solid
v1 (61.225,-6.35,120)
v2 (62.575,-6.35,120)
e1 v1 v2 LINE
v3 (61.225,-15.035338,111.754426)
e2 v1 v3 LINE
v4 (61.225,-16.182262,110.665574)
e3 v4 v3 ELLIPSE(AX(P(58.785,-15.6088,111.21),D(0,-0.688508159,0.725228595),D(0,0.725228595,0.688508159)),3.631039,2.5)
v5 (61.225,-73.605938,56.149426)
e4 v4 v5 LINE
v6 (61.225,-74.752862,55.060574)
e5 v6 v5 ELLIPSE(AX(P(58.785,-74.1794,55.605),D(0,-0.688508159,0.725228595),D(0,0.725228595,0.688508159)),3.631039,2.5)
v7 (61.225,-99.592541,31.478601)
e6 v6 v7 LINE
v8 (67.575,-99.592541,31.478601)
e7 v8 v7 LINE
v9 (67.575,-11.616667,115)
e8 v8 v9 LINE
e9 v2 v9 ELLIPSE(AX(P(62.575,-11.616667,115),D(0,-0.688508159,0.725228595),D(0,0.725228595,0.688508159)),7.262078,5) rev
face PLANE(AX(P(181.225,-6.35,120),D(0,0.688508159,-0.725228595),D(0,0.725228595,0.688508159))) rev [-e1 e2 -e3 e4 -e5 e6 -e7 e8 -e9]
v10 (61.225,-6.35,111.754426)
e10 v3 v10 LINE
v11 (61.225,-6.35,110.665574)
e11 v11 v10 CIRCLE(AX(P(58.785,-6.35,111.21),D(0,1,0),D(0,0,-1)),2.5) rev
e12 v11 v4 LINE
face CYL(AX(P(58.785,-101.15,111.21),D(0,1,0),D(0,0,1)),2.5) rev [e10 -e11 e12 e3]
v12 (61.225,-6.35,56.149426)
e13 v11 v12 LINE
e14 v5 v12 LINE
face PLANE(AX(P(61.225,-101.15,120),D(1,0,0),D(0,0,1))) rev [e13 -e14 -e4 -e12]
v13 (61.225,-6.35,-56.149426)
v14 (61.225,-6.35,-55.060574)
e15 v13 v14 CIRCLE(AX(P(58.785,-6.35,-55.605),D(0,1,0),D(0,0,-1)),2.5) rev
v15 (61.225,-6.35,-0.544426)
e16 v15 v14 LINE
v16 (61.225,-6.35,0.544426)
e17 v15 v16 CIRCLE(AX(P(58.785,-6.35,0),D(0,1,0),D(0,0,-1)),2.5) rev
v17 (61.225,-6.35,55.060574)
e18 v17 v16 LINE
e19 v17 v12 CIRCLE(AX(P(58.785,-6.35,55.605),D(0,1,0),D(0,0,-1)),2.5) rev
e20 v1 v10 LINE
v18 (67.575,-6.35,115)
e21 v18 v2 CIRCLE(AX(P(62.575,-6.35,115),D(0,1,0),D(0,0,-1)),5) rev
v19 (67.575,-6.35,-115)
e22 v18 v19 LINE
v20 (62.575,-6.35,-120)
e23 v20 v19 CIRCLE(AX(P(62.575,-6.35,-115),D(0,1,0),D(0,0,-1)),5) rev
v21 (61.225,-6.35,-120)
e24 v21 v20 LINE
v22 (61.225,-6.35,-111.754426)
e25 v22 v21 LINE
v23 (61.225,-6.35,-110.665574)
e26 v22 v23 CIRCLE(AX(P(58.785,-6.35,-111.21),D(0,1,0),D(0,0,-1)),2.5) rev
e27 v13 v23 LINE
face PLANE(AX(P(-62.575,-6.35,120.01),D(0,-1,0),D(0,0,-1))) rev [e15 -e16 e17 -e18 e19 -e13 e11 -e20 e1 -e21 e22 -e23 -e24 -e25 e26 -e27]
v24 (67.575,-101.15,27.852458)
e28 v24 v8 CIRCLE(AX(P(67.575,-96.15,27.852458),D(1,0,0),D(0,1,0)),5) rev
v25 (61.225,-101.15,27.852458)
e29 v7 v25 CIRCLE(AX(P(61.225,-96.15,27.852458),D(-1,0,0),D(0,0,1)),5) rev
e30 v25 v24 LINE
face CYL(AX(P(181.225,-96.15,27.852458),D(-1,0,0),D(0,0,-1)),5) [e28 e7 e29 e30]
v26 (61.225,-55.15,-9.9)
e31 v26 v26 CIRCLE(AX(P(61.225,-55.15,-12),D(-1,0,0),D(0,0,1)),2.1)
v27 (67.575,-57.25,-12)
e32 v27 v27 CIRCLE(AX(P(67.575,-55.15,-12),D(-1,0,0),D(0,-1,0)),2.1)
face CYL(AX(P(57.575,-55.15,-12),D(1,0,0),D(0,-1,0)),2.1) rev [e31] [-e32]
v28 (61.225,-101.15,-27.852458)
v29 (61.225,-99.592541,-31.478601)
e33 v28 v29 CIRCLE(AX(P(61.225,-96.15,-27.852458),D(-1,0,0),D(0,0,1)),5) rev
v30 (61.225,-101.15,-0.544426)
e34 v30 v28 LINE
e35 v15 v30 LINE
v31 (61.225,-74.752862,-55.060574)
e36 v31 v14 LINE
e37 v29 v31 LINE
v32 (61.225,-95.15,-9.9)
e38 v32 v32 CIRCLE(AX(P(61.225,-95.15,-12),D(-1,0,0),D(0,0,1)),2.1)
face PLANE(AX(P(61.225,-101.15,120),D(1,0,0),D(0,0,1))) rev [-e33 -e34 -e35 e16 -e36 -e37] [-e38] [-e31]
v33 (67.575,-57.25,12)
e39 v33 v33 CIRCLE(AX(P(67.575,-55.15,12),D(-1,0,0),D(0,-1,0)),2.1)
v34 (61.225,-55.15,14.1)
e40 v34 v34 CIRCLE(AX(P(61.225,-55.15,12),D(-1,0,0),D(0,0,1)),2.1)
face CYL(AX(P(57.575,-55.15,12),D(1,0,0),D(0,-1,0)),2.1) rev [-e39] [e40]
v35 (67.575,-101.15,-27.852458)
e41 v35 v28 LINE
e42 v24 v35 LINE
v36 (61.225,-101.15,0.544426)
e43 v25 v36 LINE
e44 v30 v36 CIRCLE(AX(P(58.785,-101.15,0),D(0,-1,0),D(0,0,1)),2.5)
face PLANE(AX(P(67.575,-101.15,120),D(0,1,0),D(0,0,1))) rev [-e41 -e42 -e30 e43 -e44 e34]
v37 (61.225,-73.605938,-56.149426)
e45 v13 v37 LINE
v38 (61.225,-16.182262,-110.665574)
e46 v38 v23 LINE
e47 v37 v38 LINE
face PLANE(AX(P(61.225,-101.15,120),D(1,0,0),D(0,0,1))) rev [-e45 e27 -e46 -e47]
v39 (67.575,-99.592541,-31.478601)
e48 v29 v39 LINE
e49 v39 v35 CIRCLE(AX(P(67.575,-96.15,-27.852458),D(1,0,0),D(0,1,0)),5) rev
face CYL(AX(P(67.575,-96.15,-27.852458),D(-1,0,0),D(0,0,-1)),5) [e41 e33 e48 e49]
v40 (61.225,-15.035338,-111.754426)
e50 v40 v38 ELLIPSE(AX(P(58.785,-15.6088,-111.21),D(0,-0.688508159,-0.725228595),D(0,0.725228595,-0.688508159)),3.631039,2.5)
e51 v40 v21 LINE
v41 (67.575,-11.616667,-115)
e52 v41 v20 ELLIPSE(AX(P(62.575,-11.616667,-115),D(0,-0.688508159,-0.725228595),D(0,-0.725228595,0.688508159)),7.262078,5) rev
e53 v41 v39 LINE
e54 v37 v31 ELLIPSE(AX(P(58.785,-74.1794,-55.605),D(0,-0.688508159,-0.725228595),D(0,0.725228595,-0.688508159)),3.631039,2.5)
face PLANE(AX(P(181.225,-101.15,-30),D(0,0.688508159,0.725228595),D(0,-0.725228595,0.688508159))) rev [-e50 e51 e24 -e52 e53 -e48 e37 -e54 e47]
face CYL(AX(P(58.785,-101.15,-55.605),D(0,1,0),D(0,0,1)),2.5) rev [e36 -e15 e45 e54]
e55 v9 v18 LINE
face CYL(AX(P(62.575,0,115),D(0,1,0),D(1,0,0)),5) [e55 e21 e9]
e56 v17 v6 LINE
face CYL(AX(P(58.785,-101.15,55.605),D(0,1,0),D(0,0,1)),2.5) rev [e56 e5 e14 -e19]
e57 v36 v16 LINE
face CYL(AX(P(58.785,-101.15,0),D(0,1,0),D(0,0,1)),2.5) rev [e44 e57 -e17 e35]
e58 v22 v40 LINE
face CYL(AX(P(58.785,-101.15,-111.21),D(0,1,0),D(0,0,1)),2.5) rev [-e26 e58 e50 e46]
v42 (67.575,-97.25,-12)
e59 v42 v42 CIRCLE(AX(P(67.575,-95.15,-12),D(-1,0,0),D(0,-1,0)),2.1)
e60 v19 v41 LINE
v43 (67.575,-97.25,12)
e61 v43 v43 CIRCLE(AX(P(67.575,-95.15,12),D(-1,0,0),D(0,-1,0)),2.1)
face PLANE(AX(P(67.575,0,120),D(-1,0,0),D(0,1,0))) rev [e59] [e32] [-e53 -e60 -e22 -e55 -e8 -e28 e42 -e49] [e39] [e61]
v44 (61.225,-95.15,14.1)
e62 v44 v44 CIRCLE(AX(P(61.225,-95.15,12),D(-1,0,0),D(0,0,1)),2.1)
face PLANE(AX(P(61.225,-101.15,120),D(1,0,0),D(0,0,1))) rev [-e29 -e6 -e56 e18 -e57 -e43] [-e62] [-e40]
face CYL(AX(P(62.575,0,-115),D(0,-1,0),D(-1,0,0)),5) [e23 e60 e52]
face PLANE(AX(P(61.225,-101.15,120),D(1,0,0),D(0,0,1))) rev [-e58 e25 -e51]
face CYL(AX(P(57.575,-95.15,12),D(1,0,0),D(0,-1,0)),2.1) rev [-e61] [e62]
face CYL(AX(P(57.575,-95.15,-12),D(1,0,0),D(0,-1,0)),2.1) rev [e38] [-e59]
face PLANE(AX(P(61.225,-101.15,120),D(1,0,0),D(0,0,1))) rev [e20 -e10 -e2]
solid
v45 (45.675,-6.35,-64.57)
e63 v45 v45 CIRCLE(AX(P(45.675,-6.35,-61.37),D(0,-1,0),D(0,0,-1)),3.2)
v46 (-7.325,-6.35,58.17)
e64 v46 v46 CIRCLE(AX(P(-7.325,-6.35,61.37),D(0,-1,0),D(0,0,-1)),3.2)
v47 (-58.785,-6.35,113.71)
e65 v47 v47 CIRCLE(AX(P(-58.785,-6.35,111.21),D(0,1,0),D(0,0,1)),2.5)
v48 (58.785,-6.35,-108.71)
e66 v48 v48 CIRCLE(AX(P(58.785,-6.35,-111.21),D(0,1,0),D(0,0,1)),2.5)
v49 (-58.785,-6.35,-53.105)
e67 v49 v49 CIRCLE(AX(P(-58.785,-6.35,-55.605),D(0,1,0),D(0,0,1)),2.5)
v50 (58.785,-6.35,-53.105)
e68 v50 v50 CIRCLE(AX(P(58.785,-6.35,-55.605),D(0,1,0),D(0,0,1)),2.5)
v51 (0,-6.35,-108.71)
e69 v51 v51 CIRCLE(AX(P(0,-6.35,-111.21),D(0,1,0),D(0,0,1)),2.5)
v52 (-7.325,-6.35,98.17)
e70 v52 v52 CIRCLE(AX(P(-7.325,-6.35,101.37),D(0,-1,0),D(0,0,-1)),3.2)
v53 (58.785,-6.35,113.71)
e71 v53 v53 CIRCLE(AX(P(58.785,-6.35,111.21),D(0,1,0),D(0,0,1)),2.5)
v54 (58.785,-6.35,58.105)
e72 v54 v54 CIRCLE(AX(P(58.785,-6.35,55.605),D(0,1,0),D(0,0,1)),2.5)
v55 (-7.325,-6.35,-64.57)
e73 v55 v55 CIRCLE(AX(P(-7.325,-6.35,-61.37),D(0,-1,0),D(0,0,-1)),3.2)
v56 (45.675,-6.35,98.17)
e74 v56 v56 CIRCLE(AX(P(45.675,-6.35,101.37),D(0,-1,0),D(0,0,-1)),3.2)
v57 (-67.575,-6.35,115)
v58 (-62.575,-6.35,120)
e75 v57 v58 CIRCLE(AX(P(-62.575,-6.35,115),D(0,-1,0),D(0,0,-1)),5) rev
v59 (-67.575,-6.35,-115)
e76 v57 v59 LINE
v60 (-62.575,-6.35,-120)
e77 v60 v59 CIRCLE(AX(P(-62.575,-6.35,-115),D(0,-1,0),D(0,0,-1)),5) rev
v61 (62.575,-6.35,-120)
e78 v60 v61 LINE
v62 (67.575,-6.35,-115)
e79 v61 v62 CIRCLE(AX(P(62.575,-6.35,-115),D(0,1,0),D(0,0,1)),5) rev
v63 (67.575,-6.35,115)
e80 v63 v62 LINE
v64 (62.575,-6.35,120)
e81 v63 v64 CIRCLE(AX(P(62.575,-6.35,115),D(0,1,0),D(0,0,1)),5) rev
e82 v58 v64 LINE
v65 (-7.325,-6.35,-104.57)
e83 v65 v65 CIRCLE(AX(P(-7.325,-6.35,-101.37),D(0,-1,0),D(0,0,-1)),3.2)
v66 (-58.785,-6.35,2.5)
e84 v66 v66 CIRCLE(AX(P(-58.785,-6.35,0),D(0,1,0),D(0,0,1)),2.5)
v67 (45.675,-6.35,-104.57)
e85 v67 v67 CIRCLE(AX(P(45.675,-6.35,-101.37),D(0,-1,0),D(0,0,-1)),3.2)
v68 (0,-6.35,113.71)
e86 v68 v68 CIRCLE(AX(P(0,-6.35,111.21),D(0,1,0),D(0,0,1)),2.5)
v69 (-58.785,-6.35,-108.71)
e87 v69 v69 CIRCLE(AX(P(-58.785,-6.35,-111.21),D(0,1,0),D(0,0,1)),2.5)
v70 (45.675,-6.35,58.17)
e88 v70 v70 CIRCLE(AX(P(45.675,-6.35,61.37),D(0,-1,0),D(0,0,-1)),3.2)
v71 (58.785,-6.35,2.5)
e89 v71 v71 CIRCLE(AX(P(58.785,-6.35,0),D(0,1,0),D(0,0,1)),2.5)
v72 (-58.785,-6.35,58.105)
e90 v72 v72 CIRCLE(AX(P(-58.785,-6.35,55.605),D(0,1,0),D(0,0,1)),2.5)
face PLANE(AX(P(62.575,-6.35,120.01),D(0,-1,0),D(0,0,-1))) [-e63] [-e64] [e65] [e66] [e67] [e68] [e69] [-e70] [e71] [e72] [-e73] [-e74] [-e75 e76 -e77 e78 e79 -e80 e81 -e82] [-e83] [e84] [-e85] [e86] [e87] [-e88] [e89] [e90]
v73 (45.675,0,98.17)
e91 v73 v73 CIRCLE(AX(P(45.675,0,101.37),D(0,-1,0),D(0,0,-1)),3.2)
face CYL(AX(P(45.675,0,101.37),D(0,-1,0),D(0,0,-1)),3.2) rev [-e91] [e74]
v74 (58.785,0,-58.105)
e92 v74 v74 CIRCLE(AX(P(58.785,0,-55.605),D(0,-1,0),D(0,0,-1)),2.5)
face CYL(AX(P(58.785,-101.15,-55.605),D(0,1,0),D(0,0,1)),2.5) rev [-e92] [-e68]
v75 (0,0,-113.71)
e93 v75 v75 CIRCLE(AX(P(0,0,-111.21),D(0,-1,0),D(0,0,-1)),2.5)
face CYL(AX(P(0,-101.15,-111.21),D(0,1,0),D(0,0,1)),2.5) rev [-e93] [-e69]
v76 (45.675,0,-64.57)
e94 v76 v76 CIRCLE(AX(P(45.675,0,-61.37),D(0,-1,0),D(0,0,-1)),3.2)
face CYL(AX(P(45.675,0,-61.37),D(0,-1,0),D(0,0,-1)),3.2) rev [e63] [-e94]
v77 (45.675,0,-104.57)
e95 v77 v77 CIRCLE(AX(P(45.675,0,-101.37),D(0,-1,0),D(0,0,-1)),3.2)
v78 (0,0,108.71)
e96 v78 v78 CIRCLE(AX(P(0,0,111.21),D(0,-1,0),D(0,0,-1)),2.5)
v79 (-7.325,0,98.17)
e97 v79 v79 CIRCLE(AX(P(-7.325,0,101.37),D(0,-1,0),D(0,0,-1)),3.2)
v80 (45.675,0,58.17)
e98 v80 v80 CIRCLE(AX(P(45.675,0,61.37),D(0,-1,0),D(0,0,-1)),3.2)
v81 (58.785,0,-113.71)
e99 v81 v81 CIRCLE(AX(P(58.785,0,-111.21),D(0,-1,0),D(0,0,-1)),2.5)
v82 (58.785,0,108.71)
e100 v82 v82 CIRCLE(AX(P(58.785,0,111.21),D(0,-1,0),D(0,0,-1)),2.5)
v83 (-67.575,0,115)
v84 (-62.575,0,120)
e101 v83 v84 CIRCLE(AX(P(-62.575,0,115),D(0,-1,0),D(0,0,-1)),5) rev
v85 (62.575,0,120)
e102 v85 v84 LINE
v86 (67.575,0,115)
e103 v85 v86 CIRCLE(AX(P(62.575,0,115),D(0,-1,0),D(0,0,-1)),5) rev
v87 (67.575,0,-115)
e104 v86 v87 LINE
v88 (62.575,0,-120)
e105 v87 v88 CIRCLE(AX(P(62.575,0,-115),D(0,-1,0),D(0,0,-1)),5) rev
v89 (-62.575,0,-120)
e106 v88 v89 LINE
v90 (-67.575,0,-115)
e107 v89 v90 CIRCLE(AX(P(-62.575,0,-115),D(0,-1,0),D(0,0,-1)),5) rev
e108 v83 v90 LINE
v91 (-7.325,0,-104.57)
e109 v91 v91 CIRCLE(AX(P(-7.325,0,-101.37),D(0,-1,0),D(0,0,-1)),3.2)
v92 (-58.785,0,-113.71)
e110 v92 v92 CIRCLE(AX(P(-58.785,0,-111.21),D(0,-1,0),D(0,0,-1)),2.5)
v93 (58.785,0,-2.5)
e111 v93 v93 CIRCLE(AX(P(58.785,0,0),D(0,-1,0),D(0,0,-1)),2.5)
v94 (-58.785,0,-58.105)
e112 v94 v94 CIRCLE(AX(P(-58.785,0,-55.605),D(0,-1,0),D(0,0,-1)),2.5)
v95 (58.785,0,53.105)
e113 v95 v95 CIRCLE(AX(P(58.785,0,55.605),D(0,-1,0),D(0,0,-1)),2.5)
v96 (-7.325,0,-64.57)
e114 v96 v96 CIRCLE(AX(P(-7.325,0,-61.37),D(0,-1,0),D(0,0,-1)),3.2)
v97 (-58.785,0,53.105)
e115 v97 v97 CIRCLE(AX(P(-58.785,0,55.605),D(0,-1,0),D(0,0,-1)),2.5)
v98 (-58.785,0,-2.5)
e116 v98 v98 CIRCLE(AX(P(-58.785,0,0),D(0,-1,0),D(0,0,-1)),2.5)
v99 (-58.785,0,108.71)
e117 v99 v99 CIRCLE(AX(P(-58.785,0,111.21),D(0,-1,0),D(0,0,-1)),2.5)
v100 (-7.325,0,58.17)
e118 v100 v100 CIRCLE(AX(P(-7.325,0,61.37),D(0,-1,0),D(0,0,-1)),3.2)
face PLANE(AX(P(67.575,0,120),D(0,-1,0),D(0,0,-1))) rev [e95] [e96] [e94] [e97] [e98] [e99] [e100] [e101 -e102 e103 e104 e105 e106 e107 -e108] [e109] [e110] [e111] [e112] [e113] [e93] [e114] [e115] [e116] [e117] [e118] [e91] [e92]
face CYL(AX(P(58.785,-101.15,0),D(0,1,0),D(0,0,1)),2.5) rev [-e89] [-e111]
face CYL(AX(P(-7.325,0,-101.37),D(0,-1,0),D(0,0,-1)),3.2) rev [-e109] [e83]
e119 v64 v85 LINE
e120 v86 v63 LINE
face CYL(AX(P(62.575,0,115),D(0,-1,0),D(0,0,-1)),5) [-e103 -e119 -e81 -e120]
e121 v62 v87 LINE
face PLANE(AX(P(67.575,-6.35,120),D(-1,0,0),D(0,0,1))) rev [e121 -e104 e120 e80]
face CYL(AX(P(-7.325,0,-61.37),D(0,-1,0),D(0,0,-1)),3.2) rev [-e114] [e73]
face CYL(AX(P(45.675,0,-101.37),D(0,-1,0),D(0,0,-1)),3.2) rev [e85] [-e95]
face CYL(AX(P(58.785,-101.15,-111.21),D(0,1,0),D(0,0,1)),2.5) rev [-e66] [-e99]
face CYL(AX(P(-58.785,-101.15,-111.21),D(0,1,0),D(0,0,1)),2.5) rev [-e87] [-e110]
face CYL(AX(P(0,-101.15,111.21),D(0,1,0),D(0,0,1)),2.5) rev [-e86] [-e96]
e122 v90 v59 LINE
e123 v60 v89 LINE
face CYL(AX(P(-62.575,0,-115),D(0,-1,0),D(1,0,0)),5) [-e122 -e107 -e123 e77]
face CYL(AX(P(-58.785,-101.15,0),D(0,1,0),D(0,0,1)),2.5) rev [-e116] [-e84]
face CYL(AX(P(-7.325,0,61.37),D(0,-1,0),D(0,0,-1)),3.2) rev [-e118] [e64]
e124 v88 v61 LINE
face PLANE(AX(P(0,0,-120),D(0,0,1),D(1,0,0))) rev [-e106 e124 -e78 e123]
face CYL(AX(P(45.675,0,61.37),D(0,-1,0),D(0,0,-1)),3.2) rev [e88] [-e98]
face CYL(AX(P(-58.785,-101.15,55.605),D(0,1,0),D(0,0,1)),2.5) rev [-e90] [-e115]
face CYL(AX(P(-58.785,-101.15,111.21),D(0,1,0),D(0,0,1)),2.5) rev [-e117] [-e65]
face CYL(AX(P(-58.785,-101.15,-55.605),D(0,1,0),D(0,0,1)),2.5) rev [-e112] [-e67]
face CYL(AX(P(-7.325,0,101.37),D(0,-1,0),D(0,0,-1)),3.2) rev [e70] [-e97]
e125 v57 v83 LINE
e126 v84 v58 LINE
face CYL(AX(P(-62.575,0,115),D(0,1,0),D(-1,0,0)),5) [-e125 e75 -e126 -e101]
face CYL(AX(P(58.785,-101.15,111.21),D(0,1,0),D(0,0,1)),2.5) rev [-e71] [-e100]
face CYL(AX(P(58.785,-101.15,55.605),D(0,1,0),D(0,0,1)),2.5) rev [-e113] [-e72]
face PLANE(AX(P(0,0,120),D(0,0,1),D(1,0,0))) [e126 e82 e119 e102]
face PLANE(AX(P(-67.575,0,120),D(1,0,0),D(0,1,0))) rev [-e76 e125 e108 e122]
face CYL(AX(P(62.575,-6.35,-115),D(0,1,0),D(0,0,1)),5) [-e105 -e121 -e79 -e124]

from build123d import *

# Parameters (mm, degrees)
BOSS_EXTRUDE1_DEPTH     = 120
CUT_EXTRUDE1_DEPTH      = 120
CUT_EXTRUDE2_DEPTH      = 171.873354052
CUT_EXTRUDE2_DEPTH_BACK = 171.873354052
SKETCH4_R               = 2.5
FILLET1_R               = 5
SKETCH5_R               = 2.1
CUT_EXTRUDE3_DEPTH      = 10
SPLIT1_SURFACE_1_BACK   = 294.423
SPLIT1_SURFACE_1_DEPTH  = 588.846
SPLIT1_SURFACE_2_BACK   = 294.423
SPLIT1_SURFACE_2_DEPTH  = 588.846
CUT_EXTRUDE4_DEPTH      = 168.19276487
CUT_EXTRUDE4_DEPTH_BACK = 168.19276487
SKETCH7_R               = 3.2


with BuildPart() as part:
    # Sketch1 → Boss-Extrude1 (new, symmetric)
    with BuildSketch(Plane.XY):
        Polygon((67.575, 0), (-67.575, 0), (-67.575, -101.15), (-61.225, -101.15), (-61.225, -6.35), (67.575, -6.35), align=None)
    extrude(amount=BOSS_EXTRUDE1_DEPTH, both=True)

    # Sketch2 → Cut-Extrude1 (cut, symmetric)
    with BuildSketch(Plane(origin=(-61.225, 0, 0), x_dir=(0, 0, -1), z_dir=(1, 0, 0))):
        Polygon((-120, -6.35), (-30, -101.15), (30, -101.15), (120, -6.35), (120, -206.35), (-120, -206.35), align=None)
    extrude(amount=CUT_EXTRUDE1_DEPTH, both=True, mode=Mode.SUBTRACT)

    # Sketch4 → Cut-Extrude2 (cut, two sides: drawn at the far end of the back side and taken through both)
    with BuildSketch(Plane(origin=(0, 0, 0), x_dir=(1, 0, 0), z_dir=(0, 1, 0)).offset(-CUT_EXTRUDE2_DEPTH_BACK)):
        with Locations(Location((-58.785, 111.21, 0), (0, 0, 192.578118656))):
            Circle(SKETCH4_R)
        with Locations(Location((58.785, 111.21, 0), (0, 0, 270))):
            Circle(SKETCH4_R)
        with Locations(Location((58.785, 55.605, 0), (0, 0, 270))):
            Circle(SKETCH4_R)
        with Locations(Location((-58.785, 55.605, 0), (0, 0, 192.578118656))):
            Circle(SKETCH4_R)
        with Locations(Location((-58.785, 0, 0), (0, 0, 192.578118656))):
            Circle(SKETCH4_R)
        with Locations(Location((58.785, 0, 0), (0, 0, 270))):
            Circle(SKETCH4_R)
        with Locations(Location((-58.785, -55.605, 0), (0, 0, 192.578118656))):
            Circle(SKETCH4_R)
        with Locations(Location((58.785, -55.605, 0), (0, 0, 270))):
            Circle(SKETCH4_R)
        with Locations(Location((58.785, -111.21, 0), (0, 0, 270))):
            Circle(SKETCH4_R)
        with Locations(Location((-58.785, -111.21, 0), (0, 0, 192.578118656))):
            Circle(SKETCH4_R)
        with Locations(Location((0, 111.21, 0), (0, 0, 270))):
            Circle(SKETCH4_R)
        with Locations(Location((0, -111.21, 0), (0, 0, 270))):
            Circle(SKETCH4_R)
    extrude(amount=CUT_EXTRUDE2_DEPTH + CUT_EXTRUDE2_DEPTH_BACK, mode=Mode.SUBTRACT)

    # Fillet1
    fillet1_edges = [part.edges().sort_by_distance(p)[0] for p in [
        (-67.575, -3.175, 120),
        (-64.4, -101.15, 30),
        (-64.4, -101.15, -30),
        (67.575, -3.175, 120),
        (-67.575, -3.175, -120),
        (67.575, -3.175, -120),
    ]]
    fillet(fillet1_edges, radius=FILLET1_R)

    # Sketch5 → Cut-Extrude3 (cut)
    with BuildSketch(Plane.ZY.offset(67.575)):
        with Locations(Location((12, -55.15, 0), (0, 0, 270))):
            Circle(SKETCH5_R)
        with Locations(Location((-12, -55.15, 0), (0, 0, 270))):
            Circle(SKETCH5_R)
        with Locations(Location((-12, -95.15, 0), (0, 0, 270))):
            Circle(SKETCH5_R)
        with Locations(Location((12, -95.15, 0), (0, 0, 270))):
            Circle(SKETCH5_R)
    extrude(amount=-CUT_EXTRUDE3_DEPTH, mode=Mode.SUBTRACT)


with BuildPart() as body_2:
    # Split1: the piece behind the surface
    add(part.part)
    # Split1 surface: a surface, the sketch's curves swept straight by 588.846 mm
    with BuildLine(Plane(origin=(0, 0, -120), x_dir=(-1, 0, 0), z_dir=(0, 0, -1)).offset(-SPLIT1_SURFACE_1_BACK), mode=Mode.PRIVATE) as split1_surface_1_path:
        Line((-62.575, -6.35), (107.675385549, -6.35))
    split1_surface_1 = Shell.extrude(split1_surface_1_path.wire(), (0 * SPLIT1_SURFACE_1_DEPTH, 0 * SPLIT1_SURFACE_1_DEPTH, -1 * SPLIT1_SURFACE_1_DEPTH))
    split(bisect_by=split1_surface_1, keep=Keep.BOTTOM)


with BuildPart() as part_1:
    add(part.part)

    # Split1: split by a surface, the side it looks to stays
    # Split1 surface: a surface, the sketch's curves swept straight by 588.846 mm
    with BuildLine(Plane(origin=(0, 0, -120), x_dir=(-1, 0, 0), z_dir=(0, 0, -1)).offset(-SPLIT1_SURFACE_2_BACK), mode=Mode.PRIVATE) as split1_surface_2_path:
        Line((-62.575, -6.35), (107.675385549, -6.35))
    split1_surface_2 = Shell.extrude(split1_surface_2_path.wire(), (0 * SPLIT1_SURFACE_2_DEPTH, 0 * SPLIT1_SURFACE_2_DEPTH, -1 * SPLIT1_SURFACE_2_DEPTH))
    split(bisect_by=split1_surface_2, keep=Keep.TOP)

    # Sketch7 → Cut-Extrude4 (cut, two sides: drawn at the far end of the back side and taken through both)
    with BuildSketch(Plane.XZ.offset(6.35).offset(-CUT_EXTRUDE4_DEPTH_BACK)):
        with Locations(Location((-7.325, 101.37, 0), (0, 0, 270))):
            Circle(SKETCH7_R)
        with Locations(Location((45.675, 101.37, 0), (0, 0, 270))):
            Circle(SKETCH7_R)
        with Locations(Location((45.675, 61.37, 0), (0, 0, 270))):
            Circle(SKETCH7_R)
        with Locations(Location((-7.325, 61.37, 0), (0, 0, 270))):
            Circle(SKETCH7_R)
        with Locations(Location((-7.325, -61.37, 0), (0, 0, 270))):
            Circle(SKETCH7_R)
        with Locations(Location((45.675, -61.37, 0), (0, 0, 270))):
            Circle(SKETCH7_R)
        with Locations(Location((-7.325, -101.37, 0), (0, 0, 270))):
            Circle(SKETCH7_R)
        with Locations(Location((45.675, -101.37, 0), (0, 0, 270))):
            Circle(SKETCH7_R)
    extrude(amount=CUT_EXTRUDE4_DEPTH + CUT_EXTRUDE4_DEPTH_BACK, mode=Mode.SUBTRACT)


with BuildPart() as body_3:
    # Mirror1: read off the stored shape, not the designer's step
    # Mirror1: mirrored copy
    add(body_2.part.mirror(Plane.YZ))


solid = Compound([part_1.part, body_3.part])
